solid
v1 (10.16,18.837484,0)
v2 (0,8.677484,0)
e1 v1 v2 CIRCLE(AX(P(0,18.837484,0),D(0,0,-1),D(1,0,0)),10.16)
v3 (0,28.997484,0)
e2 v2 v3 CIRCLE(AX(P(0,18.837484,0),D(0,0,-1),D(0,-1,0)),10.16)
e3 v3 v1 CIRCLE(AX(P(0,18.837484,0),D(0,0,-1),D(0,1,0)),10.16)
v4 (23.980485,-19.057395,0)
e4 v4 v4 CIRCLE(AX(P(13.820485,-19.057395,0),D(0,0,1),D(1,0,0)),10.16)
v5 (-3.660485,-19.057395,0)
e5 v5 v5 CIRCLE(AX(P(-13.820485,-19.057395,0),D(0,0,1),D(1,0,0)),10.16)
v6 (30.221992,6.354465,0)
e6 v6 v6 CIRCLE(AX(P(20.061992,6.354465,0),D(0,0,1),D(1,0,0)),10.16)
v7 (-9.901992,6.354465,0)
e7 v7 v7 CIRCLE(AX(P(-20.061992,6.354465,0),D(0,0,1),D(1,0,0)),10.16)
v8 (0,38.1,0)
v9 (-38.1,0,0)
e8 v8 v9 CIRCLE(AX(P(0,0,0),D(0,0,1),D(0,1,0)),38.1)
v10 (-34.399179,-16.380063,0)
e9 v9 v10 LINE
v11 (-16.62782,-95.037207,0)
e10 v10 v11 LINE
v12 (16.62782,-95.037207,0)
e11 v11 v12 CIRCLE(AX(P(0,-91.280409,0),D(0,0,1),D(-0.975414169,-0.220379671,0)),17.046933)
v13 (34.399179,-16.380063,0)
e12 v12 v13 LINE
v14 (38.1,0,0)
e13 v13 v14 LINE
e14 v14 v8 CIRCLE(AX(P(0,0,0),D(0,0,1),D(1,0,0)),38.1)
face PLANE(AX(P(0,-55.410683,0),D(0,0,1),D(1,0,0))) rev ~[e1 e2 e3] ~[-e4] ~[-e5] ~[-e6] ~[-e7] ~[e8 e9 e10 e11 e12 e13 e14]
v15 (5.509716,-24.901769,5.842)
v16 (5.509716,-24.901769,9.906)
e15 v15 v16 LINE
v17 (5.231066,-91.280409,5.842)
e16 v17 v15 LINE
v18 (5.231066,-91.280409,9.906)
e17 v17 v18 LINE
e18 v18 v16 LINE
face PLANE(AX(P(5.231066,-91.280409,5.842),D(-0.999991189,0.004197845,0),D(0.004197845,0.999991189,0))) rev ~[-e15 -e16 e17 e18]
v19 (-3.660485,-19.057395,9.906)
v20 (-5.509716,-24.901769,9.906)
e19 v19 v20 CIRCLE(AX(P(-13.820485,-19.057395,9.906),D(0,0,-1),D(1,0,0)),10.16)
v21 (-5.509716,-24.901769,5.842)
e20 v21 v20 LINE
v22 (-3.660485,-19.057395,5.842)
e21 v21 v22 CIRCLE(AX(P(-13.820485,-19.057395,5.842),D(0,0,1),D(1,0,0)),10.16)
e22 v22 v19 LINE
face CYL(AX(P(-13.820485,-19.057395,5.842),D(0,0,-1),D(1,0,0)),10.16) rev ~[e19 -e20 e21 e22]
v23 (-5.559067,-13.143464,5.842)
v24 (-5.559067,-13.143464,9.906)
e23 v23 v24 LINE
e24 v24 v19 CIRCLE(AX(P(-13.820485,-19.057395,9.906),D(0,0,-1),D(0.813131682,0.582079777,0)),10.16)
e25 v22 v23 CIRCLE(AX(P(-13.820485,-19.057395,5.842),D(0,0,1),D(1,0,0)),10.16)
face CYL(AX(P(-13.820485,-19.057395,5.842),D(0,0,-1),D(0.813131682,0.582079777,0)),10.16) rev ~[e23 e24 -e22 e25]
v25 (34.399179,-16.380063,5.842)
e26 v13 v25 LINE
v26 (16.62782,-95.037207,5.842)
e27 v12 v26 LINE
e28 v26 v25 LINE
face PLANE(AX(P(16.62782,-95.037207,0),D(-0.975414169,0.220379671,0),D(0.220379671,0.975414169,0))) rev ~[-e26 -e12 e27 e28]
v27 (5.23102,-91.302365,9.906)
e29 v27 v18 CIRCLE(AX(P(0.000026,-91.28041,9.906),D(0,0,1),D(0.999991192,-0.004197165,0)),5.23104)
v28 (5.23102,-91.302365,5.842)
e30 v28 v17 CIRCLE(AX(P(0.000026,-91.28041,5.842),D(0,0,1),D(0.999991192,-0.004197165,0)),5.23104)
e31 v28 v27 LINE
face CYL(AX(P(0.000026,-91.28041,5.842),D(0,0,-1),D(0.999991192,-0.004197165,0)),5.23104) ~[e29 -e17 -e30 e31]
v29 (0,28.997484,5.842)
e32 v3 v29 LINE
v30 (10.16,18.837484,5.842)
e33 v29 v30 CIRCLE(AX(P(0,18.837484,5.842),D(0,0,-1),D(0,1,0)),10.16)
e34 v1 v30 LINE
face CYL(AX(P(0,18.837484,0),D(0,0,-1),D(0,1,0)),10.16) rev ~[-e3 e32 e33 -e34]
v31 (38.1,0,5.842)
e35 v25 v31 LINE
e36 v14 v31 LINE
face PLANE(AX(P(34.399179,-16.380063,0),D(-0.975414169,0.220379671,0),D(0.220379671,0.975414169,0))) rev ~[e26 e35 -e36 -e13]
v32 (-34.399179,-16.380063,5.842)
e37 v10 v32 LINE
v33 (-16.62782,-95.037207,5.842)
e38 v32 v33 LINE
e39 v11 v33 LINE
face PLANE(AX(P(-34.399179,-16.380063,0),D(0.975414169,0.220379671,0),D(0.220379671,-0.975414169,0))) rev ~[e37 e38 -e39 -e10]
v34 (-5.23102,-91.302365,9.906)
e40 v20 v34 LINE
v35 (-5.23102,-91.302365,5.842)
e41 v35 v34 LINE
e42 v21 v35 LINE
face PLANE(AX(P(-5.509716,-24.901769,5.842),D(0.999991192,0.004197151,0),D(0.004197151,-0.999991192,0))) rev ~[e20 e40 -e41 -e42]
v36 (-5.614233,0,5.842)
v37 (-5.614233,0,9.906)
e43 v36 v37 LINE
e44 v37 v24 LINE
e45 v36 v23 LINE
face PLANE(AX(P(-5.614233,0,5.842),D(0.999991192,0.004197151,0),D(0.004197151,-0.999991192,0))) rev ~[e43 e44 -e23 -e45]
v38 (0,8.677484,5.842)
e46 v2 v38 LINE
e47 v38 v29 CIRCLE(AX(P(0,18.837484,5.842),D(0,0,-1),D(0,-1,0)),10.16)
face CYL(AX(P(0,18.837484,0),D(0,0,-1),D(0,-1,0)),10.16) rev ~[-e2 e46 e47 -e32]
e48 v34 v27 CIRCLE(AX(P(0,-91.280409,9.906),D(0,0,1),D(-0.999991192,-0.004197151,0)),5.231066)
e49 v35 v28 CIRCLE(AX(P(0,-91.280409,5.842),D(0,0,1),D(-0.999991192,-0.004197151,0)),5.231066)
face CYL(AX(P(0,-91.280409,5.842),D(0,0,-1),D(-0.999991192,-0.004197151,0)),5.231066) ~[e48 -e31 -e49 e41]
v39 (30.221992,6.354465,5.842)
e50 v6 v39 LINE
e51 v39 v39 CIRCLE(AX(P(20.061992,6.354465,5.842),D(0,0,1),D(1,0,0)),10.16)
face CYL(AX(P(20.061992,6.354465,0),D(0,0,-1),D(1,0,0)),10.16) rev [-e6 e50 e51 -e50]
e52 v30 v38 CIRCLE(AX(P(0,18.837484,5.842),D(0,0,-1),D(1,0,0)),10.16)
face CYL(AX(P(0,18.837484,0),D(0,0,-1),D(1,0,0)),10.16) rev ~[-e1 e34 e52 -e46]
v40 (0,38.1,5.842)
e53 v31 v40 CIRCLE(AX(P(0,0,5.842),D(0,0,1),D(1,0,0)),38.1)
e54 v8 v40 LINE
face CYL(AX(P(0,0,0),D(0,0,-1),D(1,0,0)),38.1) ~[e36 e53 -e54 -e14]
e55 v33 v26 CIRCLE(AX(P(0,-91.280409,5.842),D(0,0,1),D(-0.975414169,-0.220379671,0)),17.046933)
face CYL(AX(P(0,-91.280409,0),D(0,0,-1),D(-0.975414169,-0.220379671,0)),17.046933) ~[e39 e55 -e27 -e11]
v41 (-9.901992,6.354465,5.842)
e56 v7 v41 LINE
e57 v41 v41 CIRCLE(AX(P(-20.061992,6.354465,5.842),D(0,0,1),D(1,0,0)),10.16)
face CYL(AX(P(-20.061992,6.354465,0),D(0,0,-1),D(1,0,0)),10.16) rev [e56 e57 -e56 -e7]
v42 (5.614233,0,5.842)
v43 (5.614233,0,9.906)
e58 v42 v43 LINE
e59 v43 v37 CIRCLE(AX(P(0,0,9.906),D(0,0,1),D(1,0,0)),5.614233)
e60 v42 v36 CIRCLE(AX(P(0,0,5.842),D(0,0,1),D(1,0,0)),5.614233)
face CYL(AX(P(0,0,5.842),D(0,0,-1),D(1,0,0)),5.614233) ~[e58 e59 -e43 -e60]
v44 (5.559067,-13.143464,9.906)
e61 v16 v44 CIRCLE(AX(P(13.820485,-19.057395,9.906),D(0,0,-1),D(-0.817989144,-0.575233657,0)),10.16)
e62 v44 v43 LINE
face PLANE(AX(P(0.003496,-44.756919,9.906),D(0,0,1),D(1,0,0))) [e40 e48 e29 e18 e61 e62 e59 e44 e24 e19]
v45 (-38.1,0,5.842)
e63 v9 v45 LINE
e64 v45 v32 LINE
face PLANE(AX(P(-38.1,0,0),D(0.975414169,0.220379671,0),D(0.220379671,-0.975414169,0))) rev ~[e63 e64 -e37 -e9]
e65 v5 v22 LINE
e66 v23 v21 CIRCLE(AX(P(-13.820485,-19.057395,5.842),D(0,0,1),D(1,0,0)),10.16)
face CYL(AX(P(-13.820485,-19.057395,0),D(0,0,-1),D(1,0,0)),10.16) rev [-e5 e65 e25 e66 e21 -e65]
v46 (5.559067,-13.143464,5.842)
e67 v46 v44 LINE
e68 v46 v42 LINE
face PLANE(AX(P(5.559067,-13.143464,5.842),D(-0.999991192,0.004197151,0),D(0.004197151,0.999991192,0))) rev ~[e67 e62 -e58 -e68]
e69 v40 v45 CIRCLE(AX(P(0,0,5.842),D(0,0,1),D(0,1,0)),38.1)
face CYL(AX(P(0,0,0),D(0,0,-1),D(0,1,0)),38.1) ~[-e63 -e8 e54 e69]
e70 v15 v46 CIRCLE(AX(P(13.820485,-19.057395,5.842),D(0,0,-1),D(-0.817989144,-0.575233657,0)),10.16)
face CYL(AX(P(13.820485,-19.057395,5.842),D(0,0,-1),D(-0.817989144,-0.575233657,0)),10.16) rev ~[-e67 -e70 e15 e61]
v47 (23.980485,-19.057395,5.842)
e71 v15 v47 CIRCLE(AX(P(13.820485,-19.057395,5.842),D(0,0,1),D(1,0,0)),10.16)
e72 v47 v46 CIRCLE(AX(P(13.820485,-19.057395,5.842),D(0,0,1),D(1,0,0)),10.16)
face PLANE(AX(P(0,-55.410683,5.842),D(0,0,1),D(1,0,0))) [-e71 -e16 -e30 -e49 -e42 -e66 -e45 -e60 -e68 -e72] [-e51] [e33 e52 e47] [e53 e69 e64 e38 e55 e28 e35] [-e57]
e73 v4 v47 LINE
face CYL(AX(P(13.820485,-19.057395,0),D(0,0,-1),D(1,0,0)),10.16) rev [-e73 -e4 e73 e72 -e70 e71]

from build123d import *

# Parameters (mm, degrees)
F0_R     = 10.16
F1_DEPTH = 5.842
F2_DEPTH = 5.842
F4_DEPTH = 4.064


# Not quite as in the source:
# - after a boolean that leaves OpenCascade's solid faulty, fix() repairs it
# - ends of sketch curves that miss each other by under 0.0002 mm in the source are joined


with BuildPart() as f1:
    # F0 (on Top) → F1 (new body)
    with BuildSketch(Plane.XY):
        with BuildLine():
            Line((0, 28.9974835998), (0, 38.1))
            ThreePointArc((0, 38.1), (-26.9407683632, 26.9407683632), (-38.1, 0))
            Line((-38.1, 0), (-34.39917941, -16.3800627568))
            ThreePointArc((-34.39917941, -16.3800627568), (-20.3412095138, -32.2156048448), (0, -38.1))
            Line((0, -38.1), (0, 8.6774835998))
            ThreePointArc((0, 8.6774835998), (-10.16, 18.8374835998), (0, 28.9974835998))
        make_face()
        with Locations((-13.8204852119, -19.0573949367)):
            Circle(F0_R, mode=Mode.SUBTRACT)
        with Locations((-20.0619921088, 6.3544651493)):
            Circle(F0_R, mode=Mode.SUBTRACT)
        with BuildLine():
            Line((34.39917941, -16.3800627568), (38.1, 0))
            ThreePointArc((38.1, 0), (26.9407683632, 26.9407683632), (0, 38.1))
            Line((0, 38.1), (0, 28.9974835998))
            ThreePointArc((0, 28.9974835998), (7.1842048969, 26.0216884966), (10.16, 18.8374835998))
            ThreePointArc((10.16, 18.8374835998), (7.1842048969, 11.6532787029), (0, 8.6774835998))
            Line((0, 8.6774835998), (0, -38.1))
            ThreePointArc((0, -38.1), (20.3412095138, -32.2156048448), (34.39917941, -16.3800627568))
        make_face()
        with Locations((13.8204852119, -19.0573949367)):
            Circle(F0_R, mode=Mode.SUBTRACT)
        with Locations((20.0619921088, 6.3544651493)):
            Circle(F0_R, mode=Mode.SUBTRACT)
    extrude(amount=F1_DEPTH)

    # F0 (on Top) → F2 (join)
    with BuildSketch(Plane.XY):
        with BuildLine():
            Line((16.6278202087, -95.0372070074), (34.39917941, -16.3800627568))
            ThreePointArc((34.39917941, -16.3800627568), (20.3412095138, -32.2156048448), (0, -38.1))
            ThreePointArc((0, -38.1), (-20.3412095138, -32.2156048448), (-34.39917941, -16.3800627568))
            Line((-34.39917941, -16.3800627568), (-16.6278202087, -95.0372070074))
            ThreePointArc((-16.6278202087, -95.0372070074), (0, -108.3273427039), (16.6278202087, -95.0372070074))
        make_face()
    extrude(amount=F2_DEPTH)

    # F3 (on face) → F4 (join)
    with BuildSketch(Plane.XY.offset(5.842)):
        with BuildLine():
            Line((5.5590673185, -13.1434644002), (5.6142329033, 0))
            ThreePointArc((5.6142329033, 0), (0, 5.6142329033), (-5.6142329033, 0))
            Line((-5.6142329033, 0), (-5.5590673185, -13.1434644002))
            ThreePointArc((-5.5590673185, -13.1434644002), (-4.1467680929, -15.9517875723), (-3.6604852119, -19.0573949367))
            ThreePointArc((-3.6604852119, -19.0573949367), (-4.1338185981, -22.1223728994), (-5.5097155096, -24.9017688941))
            Line((-5.5097155096, -24.9017688941), (-5.2310197557, -91.3023650429))
            ThreePointArc((-5.2310197557, -91.3023650429), (-0.0109778096, -86.0493551595), (5.2310658314, -91.280409472))
            Line((5.2310658314, -91.280409472), (5.5097155096, -24.9017688941))
            ThreePointArc((5.5097155096, -24.9017688941), (3.660574702, -19.014751887), (5.5590673185, -13.1434644002))
        make_face()
        with BuildLine():
            ThreePointArc((5.2310197557, -91.3023650429), (5.2310543125, -91.2913872816), (5.2310658314, -91.280409472))
            ThreePointArc((5.2310658314, -91.280409472), (-0.0109778096, -86.0493551595), (-5.2310197557, -91.3023650429))
            ThreePointArc((-5.2310197557, -91.3023650429), (0, -96.5114753034), (5.2310197557, -91.3023650429))
        make_face()
    extrude(amount=F4_DEPTH)

    add(f1.part.fix(), mode=Mode.REPLACE)


solid = f1.part
